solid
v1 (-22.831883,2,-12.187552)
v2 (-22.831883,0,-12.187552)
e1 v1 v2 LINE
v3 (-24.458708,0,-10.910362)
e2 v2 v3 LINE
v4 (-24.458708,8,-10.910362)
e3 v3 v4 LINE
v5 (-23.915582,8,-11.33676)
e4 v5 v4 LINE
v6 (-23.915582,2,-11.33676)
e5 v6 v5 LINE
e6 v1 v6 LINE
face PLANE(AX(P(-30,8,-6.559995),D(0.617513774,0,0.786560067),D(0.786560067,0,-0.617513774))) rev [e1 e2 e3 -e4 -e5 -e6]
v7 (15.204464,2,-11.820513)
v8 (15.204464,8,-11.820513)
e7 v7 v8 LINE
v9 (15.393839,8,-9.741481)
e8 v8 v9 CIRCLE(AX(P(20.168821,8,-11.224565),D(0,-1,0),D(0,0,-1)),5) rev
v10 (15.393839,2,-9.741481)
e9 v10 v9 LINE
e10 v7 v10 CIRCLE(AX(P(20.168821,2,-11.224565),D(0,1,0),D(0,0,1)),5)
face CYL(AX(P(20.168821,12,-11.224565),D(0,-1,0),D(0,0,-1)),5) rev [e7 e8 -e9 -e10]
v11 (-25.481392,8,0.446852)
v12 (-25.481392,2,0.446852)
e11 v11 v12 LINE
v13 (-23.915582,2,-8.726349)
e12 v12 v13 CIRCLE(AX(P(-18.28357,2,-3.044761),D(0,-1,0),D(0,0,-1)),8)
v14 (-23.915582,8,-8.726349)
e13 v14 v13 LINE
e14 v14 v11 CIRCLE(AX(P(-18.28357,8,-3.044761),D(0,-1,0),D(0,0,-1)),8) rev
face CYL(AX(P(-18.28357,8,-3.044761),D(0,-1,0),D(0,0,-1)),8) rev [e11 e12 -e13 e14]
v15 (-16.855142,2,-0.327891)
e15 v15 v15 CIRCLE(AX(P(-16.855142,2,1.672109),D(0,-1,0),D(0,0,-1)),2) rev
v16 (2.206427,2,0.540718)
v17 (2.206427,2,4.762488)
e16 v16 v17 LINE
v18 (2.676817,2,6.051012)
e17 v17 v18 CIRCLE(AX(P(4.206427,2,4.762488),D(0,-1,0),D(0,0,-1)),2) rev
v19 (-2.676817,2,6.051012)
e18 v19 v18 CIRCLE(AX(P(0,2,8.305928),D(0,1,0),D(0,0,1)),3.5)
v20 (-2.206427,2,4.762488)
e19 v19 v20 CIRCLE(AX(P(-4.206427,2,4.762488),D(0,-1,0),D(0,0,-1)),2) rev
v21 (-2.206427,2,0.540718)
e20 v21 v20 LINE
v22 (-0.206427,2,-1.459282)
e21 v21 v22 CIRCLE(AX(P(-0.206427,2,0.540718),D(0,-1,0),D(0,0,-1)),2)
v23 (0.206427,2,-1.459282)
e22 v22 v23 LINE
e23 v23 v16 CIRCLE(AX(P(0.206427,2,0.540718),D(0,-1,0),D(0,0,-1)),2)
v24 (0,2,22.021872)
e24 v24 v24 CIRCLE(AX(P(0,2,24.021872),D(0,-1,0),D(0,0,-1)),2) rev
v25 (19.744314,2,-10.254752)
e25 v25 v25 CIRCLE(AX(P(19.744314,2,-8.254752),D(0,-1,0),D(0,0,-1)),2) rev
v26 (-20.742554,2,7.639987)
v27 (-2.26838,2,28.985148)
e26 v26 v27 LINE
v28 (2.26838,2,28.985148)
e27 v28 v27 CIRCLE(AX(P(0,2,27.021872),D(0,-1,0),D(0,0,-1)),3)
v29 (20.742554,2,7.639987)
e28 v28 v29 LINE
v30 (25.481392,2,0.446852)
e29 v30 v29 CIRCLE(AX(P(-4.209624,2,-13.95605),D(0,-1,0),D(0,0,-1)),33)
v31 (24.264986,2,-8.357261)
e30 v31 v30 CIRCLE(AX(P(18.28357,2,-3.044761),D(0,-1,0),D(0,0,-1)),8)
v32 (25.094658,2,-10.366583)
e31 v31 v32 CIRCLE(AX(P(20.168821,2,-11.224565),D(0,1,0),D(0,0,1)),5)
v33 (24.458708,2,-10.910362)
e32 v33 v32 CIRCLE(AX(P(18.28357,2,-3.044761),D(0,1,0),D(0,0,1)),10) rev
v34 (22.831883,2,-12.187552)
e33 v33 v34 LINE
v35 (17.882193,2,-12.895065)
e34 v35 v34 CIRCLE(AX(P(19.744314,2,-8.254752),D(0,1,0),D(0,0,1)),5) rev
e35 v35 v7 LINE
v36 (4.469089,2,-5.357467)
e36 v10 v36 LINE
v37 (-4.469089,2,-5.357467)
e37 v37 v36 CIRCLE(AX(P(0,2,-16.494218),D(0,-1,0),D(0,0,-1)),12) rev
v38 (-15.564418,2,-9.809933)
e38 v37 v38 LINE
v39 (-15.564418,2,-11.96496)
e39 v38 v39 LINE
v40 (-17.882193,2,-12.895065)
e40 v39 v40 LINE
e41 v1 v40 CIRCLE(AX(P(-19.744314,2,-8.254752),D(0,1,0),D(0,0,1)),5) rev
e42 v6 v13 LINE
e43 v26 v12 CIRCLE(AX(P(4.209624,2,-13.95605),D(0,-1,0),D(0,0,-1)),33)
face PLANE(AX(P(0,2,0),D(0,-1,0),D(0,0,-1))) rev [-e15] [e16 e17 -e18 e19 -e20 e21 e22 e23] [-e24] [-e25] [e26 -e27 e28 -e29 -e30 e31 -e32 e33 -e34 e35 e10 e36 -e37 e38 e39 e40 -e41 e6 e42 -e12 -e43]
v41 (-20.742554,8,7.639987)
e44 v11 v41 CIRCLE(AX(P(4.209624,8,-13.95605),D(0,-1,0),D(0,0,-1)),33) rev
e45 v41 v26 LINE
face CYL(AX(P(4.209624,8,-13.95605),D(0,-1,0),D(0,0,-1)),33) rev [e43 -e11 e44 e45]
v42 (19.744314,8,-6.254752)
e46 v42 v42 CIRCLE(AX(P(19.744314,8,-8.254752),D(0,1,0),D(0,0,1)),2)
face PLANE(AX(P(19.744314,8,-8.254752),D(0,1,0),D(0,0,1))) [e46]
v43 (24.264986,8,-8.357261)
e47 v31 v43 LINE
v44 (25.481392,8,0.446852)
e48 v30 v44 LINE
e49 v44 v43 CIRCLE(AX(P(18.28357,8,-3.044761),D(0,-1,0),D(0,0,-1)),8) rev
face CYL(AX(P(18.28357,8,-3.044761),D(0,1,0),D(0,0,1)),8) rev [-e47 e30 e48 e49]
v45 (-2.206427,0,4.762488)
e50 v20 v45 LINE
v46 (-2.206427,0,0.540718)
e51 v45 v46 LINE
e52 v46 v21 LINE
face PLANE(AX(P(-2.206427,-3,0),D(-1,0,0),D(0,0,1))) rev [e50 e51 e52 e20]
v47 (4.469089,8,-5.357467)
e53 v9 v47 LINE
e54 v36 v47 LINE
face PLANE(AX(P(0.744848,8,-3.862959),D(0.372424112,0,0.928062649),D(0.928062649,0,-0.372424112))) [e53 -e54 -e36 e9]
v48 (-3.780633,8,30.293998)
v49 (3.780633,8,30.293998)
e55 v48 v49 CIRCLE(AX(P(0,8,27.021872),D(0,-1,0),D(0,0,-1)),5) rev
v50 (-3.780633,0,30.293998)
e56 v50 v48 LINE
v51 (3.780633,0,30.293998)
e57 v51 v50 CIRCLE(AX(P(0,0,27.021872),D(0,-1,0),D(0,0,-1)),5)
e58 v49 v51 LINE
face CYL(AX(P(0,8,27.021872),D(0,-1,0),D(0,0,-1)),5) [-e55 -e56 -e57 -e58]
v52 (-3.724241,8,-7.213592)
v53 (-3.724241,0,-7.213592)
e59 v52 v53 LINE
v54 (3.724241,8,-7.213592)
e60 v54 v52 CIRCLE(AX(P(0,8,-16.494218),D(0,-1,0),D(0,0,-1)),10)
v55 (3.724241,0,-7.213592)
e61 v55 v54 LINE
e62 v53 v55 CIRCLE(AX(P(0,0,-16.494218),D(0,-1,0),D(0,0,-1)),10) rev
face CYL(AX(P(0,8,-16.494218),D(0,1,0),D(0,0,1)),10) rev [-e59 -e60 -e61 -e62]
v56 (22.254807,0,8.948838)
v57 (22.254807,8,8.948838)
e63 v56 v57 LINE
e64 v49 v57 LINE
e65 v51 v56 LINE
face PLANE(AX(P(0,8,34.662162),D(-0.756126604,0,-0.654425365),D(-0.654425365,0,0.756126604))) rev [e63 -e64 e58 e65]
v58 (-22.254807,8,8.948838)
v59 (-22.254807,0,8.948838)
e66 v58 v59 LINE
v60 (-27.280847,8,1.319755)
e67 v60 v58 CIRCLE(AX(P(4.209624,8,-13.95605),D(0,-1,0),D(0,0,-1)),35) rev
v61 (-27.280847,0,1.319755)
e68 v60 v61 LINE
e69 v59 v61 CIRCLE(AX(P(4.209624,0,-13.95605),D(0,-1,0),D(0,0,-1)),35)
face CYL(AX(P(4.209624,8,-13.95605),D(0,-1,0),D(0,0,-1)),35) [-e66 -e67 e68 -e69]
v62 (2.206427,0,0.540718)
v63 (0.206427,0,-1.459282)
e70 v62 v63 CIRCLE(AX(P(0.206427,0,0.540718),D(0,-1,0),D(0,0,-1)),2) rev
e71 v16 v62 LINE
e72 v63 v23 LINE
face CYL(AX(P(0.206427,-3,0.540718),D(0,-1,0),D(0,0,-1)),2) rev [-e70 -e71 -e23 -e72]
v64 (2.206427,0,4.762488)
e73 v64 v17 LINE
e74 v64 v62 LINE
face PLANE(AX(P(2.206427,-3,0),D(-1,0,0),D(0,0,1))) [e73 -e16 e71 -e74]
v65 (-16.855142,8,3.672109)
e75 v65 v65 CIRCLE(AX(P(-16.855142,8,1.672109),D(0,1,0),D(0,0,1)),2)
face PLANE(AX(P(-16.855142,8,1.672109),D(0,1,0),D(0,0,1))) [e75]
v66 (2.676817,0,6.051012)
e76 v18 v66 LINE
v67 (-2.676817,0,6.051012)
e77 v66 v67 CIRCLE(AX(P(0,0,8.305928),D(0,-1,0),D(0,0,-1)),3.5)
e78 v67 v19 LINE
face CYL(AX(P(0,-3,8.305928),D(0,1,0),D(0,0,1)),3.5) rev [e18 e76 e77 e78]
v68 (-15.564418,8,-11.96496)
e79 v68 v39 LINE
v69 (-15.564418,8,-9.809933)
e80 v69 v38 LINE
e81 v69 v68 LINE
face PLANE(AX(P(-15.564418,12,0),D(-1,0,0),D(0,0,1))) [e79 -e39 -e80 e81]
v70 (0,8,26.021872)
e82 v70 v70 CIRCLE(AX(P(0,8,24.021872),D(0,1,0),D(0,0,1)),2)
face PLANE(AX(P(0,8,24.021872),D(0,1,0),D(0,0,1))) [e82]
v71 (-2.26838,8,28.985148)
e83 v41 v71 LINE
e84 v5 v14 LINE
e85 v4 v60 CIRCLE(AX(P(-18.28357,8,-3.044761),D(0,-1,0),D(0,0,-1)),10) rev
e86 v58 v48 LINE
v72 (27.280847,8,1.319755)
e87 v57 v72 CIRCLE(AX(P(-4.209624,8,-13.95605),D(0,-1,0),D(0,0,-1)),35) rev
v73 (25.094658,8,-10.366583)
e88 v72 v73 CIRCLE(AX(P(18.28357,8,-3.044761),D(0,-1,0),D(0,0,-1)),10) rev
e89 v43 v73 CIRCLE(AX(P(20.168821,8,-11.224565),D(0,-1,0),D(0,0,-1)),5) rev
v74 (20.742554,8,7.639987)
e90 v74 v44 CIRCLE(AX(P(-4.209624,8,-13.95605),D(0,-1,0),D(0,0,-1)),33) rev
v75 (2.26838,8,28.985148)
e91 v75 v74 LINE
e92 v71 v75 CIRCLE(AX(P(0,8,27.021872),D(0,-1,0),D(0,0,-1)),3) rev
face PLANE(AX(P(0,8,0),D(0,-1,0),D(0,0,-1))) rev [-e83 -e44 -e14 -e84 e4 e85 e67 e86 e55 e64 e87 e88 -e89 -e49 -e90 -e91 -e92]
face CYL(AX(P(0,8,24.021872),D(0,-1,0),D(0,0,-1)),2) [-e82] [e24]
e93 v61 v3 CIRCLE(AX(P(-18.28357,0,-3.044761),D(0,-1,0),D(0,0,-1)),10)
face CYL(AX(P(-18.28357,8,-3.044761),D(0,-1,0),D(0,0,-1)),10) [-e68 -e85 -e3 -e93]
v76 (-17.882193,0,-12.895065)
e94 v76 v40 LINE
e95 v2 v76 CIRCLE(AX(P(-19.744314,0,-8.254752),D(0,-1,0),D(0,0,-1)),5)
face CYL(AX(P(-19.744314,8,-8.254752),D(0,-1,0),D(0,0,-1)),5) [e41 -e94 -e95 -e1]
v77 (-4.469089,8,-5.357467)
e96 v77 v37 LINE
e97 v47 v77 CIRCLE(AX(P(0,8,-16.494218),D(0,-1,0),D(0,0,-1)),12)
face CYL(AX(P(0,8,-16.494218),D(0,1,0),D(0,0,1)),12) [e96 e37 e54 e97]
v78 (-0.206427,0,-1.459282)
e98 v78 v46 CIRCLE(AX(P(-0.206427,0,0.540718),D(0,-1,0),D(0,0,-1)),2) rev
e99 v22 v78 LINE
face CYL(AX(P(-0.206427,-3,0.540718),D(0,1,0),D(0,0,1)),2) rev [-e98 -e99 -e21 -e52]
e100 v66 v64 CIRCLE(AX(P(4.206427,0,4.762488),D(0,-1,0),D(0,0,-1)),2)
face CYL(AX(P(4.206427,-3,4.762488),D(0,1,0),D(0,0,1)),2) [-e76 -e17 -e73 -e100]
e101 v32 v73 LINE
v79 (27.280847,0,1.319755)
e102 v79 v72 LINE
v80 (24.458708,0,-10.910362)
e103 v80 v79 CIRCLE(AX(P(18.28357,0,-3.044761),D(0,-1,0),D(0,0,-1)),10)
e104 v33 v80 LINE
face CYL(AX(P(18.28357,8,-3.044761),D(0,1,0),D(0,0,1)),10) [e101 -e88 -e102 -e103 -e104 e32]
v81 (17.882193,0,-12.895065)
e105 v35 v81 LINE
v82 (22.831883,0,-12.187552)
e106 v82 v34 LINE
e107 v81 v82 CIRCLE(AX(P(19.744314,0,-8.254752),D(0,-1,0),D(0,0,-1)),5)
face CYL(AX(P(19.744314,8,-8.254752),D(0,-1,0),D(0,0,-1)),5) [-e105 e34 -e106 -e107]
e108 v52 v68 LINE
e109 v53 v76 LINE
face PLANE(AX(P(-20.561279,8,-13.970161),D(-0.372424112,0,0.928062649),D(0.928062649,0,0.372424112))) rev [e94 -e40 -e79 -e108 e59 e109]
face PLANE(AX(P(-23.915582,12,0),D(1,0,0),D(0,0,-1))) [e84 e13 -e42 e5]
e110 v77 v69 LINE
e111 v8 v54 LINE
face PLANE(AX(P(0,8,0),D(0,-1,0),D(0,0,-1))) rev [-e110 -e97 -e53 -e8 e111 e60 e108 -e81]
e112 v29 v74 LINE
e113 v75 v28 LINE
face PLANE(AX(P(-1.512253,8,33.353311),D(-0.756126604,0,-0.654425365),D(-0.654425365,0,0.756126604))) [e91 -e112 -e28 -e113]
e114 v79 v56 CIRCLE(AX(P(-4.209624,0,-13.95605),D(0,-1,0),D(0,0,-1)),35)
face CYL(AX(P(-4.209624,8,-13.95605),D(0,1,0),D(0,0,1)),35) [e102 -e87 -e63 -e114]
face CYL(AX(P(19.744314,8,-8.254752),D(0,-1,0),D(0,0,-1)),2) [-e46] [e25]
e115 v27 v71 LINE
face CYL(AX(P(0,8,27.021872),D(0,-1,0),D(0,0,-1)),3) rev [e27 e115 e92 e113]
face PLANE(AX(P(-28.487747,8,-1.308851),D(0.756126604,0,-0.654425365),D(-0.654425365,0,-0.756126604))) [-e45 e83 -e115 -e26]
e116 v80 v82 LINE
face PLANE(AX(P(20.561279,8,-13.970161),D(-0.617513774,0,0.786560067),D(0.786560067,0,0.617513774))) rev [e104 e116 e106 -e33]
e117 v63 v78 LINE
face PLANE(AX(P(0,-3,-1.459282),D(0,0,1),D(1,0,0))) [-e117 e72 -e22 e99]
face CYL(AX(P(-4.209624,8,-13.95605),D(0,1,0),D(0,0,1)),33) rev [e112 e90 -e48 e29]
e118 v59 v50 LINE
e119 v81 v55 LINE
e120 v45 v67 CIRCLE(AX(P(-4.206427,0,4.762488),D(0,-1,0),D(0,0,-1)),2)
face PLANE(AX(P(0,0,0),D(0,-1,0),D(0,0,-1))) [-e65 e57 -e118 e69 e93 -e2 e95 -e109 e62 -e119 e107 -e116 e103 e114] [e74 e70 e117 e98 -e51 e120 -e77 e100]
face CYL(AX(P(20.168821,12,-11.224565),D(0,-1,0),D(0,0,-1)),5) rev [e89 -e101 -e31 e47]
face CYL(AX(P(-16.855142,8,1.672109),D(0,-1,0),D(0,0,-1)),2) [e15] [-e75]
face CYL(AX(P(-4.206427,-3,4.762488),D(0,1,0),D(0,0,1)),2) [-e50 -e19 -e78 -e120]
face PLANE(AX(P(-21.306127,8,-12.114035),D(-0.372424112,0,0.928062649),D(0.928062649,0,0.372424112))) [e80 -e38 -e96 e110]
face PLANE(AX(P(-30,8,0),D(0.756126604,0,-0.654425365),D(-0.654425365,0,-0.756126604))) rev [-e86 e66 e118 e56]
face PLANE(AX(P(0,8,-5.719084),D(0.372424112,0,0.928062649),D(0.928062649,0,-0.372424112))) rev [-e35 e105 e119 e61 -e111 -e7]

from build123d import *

# Parameters (mm, degrees)
SALIENTE_EXTRUIR1_DEPTH = 8
REDONDEO3_R             = 5
REDONDEO4_R             = 5
REDONDEO5_R             = 35
REDONDEO6_R             = 10
REDONDEO7_R             = 10
VACIADO1_T              = -2
CROQUIS2_R              = 2
SALIENTE_EXTRUIR2_DEPTH = 6
CROQUIS3_R              = 5
CORTAR_EXTRUIR1_DEPTH   = 10
CROQUIS4_R              = 2
SALIENTE_EXTRUIR4_DEPTH = 6
CORTAR_EXTRUIR2_START   = 10
CORTAR_EXTRUIR2_DEPTH   = 10
CROQUIS6_R              = 2
SALIENTE_EXTRUIR5_DEPTH = 6
CROQUIS7_R              = 2.5
CORTAR_EXTRUIR3_DEPTH   = 10
CORTAR_EXTRUIR4_DEPTH   = 5
REDONDEO8_R             = 2


with BuildPart() as part:
    # Croquis1 → Saliente-Extruir1 (new body)
    with BuildSketch(Plane(origin=(0, 0, 0), x_dir=(1, 0, 0), z_dir=(0, 1, 0))):
        Polygon((-30, 0), (-30, 6.559995295), (-20.5612792, 13.970160587), (0, 5.719083833), (20.5612792, 13.970160587), (30, 6.559995295), (30, 0), (0, -34.662162162), align=None)
    extrude(amount=SALIENTE_EXTRUIR1_DEPTH)

    # Redondeo3
    redondeo3_edges = [part.edges().sort_by_distance(p)[0] for p in [
        (0, 4, 34.662162162),
    ]]
    fillet(redondeo3_edges, radius=REDONDEO3_R)

    # Redondeo4
    redondeo4_edges = [part.edges().sort_by_distance(p)[0] for p in [
        (-20.5612792, 4, -13.970160587),
        (20.5612792, 4, -13.970160587),
    ]]
    fillet(redondeo4_edges, radius=REDONDEO4_R)

    # Redondeo5
    # the kernel refuses this fillet: 35 mm, written as the material it takes off along each edge
    with BuildSketch(Plane(origin=(-30, -29.587762227, 0), x_dir=(0.6544253650435297, 0, 0.7561266042056997), z_dir=(0, 1, 0))) as redondeo5_piece_1:
        with BuildLine():
            CenterArc((11.835104891, 35), REDONDEO5_R, 241.323383223, 28.676616777)
            Line((-4.960186966, 4.293027316), (-5.296092803, 3.678887862))
            ThreePointArc((-5.296092803, 3.678887862), (-2.938191238, 1.617225035), (-0.458097756, -0.529288623))
            Line((-0.458097756, -0.529288623), (0, -0.7))
            Line((0, -0.7), (11.835104891, -0.7))
            Line((11.835104891, -0.7), (11.835104891, 0))
        make_face()
    extrude(amount=67.175524454, mode=Mode.SUBTRACT)
    with BuildSketch(Plane(origin=(30, -29.587762227, 0), x_dir=(0, 0, -1), z_dir=(0, 1, 0))) as redondeo5_piece_2:
        with BuildLine():
            CenterArc((13.956050105, 34.209623986), REDONDEO5_R, 229.12390756, 28.676616777)
            Line((-8.948837672, 7.745192839), (-9.406935427, 7.215904216))
            Line((-9.406935427, 7.215904216), (-0.458097756, -0.529288623))
            Line((-0.458097756, -0.529288623), (0, -0.7))
            ThreePointArc((0, -0.7), (3.279997647, -0.7), (6.412074199, -0.68419248))
            Line((6.412074199, -0.68419248), (6.559995295, 0))
        make_face()
    extrude(amount=67.175524454, mode=Mode.SUBTRACT)

    # Redondeo6
    redondeo6_edges = [part.edges().sort_by_distance(p)[0] for p in [
        (-30, 4, -6.559995295),
        (30, 4, -6.559995295),
    ]]
    fillet(redondeo6_edges, radius=REDONDEO6_R)

    # Redondeo7
    redondeo7_edges = [part.edges().sort_by_distance(p)[0] for p in [
        (0, 4, -5.719083833),
    ]]
    fillet(redondeo7_edges, radius=REDONDEO7_R)

    # Vaciado1
    vaciado1_openings = [part.faces().sort_by_distance(p)[0] for p in [
        (0, 8, 5.527661799),
    ]]
    offset(amount=VACIADO1_T, openings=vaciado1_openings, kind=Kind.INTERSECTION)

    # Croquis2 → Saliente-Extruir2 (add, through all)
    with BuildSketch(Plane(origin=(0, 2, 0), x_dir=(1, 0, 0), z_dir=(0, 1, 0))):
        with Locations(Location((0, -24.021871509, 0), (0, 0, 90))):
            Circle(CROQUIS2_R)
    extrude(amount=SALIENTE_EXTRUIR2_DEPTH)

    # Croquis3 → Cortar-Extruir1 (cut)
    with BuildSketch(Plane(origin=(0, 2, 0), x_dir=(1, 0, 0), z_dir=(0, 1, 0))):
        with Locations((20.168821407, 11.224565194)):
            Circle(CROQUIS3_R)
    extrude(amount=CORTAR_EXTRUIR1_DEPTH, mode=Mode.SUBTRACT)

    # Croquis4 → Saliente-Extruir4 (add, through all)
    with BuildSketch(Plane(origin=(0, 2, 0), x_dir=(1, 0, 0), z_dir=(0, 1, 0))):
        with Locations(Location((19.744313659, 8.254751535, 0), (0, 0, 90))):
            Circle(CROQUIS4_R)
    extrude(amount=SALIENTE_EXTRUIR4_DEPTH)

    # Croquis5 → Cortar-Extruir2 (cut)
    with BuildSketch(Plane(origin=(0, 2, 0), x_dir=(1, 0, 0), z_dir=(0, 1, 0)).offset(CORTAR_EXTRUIR2_START)):
        with BuildLine():
            Line((-23.915581781, 14.17421255), (-23.915581781, 8.72634885))
            ThreePointArc((-23.915581781, 8.72634885), (-23.578448406, 9.04178192), (-23.22368003, 9.33724145))
            Line((-23.22368003, 9.33724145), (-21.596854982, 10.614431735))
            ThreePointArc((-21.596854982, 10.614431735), (-20.168821407, 11.224565194), (-18.627041323, 11.038939482))
            Line((-18.627041323, 11.038939482), (-15.564418219, 9.809933346))
            Line((-15.564418219, 9.809933346), (-15.564418219, 14.17421255))
            Line((-15.564418219, 14.17421255), (-23.915581781, 14.17421255))
        make_face()
    extrude(amount=-CORTAR_EXTRUIR2_DEPTH, mode=Mode.SUBTRACT)

    # Croquis6 → Saliente-Extruir5 (add, through all)
    with BuildSketch(Plane(origin=(0, 2, 0), x_dir=(1, 0, 0), z_dir=(0, 1, 0))):
        with Locations(Location((-16.8551421, -1.672109492, 0), (0, 0, 90))):
            Circle(CROQUIS6_R)
    extrude(amount=SALIENTE_EXTRUIR5_DEPTH)

    # Croquis7 → Cortar-Extruir3 (cut)
    with BuildSketch(Plane(origin=(0, 2, 0), x_dir=(1, 0, 0), z_dir=(0, 1, 0))):
        with Locations(Location((0, -8.30592839, 0), (0, 0, 270))):
            Circle(CROQUIS7_R)
    extrude(amount=-CORTAR_EXTRUIR3_DEPTH, mode=Mode.SUBTRACT)

    # Croquis8 → Cortar-Extruir4 (cut)
    with BuildSketch(Plane(origin=(0, 2, 0), x_dir=(1, 0, 0), z_dir=(0, 1, 0))):
        with BuildLine():
            Line((2.20642721, 1.459281861), (-2.20642721, 1.459281861))
            Line((-2.20642721, 1.459281861), (-2.20642721, -5.589003848))
            ThreePointArc((-2.20642721, -5.589003848), (0, -4.80592839), (2.20642721, -5.589003848))
            Line((2.20642721, -5.589003848), (2.20642721, 1.459281861))
        make_face()
        with BuildLine():
            ThreePointArc((2.20642721, -5.589003848), (0, -4.80592839), (-2.20642721, -5.589003848))
            Line((-2.20642721, -5.589003848), (-2.20642721, -7.130479979))
            ThreePointArc((-2.20642721, -7.130479979), (0, -5.80592839), (2.20642721, -7.130479979))
            Line((2.20642721, -7.130479979), (2.20642721, -5.589003848))
        make_face()
        with BuildLine():
            Line((-2.20642721, -7.130479979), (-2.20642721, -5.589003848))
            ThreePointArc((-2.20642721, -5.589003848), (-1.504577144, -11.46603086), (3.5, -8.30592839))
            ThreePointArc((3.5, -8.30592839), (3.160102469, -6.801351246), (2.20642721, -5.589003848))
            Line((2.20642721, -5.589003848), (2.20642721, -7.130479979))
            ThreePointArc((2.20642721, -7.130479979), (2.425496653, -7.700151214), (2.5, -8.30592839))
            ThreePointArc((2.5, -8.30592839), (-0.605777176, -10.731425043), (-2.20642721, -7.130479979))
        make_face()
    extrude(amount=-CORTAR_EXTRUIR4_DEPTH, mode=Mode.SUBTRACT)

    # Redondeo8
    redondeo8_edges = [part.edges().sort_by_distance(p)[0] for p in [
        (-2.20642721, 1, 5.589003848),
        (-2.20642721, 1, -1.459281861),
        (2.20642721, 1, -1.459281861),
        (2.20642721, 1, 5.589003848),
    ]]
    fillet(redondeo8_edges, radius=REDONDEO8_R)


solid = part.part
